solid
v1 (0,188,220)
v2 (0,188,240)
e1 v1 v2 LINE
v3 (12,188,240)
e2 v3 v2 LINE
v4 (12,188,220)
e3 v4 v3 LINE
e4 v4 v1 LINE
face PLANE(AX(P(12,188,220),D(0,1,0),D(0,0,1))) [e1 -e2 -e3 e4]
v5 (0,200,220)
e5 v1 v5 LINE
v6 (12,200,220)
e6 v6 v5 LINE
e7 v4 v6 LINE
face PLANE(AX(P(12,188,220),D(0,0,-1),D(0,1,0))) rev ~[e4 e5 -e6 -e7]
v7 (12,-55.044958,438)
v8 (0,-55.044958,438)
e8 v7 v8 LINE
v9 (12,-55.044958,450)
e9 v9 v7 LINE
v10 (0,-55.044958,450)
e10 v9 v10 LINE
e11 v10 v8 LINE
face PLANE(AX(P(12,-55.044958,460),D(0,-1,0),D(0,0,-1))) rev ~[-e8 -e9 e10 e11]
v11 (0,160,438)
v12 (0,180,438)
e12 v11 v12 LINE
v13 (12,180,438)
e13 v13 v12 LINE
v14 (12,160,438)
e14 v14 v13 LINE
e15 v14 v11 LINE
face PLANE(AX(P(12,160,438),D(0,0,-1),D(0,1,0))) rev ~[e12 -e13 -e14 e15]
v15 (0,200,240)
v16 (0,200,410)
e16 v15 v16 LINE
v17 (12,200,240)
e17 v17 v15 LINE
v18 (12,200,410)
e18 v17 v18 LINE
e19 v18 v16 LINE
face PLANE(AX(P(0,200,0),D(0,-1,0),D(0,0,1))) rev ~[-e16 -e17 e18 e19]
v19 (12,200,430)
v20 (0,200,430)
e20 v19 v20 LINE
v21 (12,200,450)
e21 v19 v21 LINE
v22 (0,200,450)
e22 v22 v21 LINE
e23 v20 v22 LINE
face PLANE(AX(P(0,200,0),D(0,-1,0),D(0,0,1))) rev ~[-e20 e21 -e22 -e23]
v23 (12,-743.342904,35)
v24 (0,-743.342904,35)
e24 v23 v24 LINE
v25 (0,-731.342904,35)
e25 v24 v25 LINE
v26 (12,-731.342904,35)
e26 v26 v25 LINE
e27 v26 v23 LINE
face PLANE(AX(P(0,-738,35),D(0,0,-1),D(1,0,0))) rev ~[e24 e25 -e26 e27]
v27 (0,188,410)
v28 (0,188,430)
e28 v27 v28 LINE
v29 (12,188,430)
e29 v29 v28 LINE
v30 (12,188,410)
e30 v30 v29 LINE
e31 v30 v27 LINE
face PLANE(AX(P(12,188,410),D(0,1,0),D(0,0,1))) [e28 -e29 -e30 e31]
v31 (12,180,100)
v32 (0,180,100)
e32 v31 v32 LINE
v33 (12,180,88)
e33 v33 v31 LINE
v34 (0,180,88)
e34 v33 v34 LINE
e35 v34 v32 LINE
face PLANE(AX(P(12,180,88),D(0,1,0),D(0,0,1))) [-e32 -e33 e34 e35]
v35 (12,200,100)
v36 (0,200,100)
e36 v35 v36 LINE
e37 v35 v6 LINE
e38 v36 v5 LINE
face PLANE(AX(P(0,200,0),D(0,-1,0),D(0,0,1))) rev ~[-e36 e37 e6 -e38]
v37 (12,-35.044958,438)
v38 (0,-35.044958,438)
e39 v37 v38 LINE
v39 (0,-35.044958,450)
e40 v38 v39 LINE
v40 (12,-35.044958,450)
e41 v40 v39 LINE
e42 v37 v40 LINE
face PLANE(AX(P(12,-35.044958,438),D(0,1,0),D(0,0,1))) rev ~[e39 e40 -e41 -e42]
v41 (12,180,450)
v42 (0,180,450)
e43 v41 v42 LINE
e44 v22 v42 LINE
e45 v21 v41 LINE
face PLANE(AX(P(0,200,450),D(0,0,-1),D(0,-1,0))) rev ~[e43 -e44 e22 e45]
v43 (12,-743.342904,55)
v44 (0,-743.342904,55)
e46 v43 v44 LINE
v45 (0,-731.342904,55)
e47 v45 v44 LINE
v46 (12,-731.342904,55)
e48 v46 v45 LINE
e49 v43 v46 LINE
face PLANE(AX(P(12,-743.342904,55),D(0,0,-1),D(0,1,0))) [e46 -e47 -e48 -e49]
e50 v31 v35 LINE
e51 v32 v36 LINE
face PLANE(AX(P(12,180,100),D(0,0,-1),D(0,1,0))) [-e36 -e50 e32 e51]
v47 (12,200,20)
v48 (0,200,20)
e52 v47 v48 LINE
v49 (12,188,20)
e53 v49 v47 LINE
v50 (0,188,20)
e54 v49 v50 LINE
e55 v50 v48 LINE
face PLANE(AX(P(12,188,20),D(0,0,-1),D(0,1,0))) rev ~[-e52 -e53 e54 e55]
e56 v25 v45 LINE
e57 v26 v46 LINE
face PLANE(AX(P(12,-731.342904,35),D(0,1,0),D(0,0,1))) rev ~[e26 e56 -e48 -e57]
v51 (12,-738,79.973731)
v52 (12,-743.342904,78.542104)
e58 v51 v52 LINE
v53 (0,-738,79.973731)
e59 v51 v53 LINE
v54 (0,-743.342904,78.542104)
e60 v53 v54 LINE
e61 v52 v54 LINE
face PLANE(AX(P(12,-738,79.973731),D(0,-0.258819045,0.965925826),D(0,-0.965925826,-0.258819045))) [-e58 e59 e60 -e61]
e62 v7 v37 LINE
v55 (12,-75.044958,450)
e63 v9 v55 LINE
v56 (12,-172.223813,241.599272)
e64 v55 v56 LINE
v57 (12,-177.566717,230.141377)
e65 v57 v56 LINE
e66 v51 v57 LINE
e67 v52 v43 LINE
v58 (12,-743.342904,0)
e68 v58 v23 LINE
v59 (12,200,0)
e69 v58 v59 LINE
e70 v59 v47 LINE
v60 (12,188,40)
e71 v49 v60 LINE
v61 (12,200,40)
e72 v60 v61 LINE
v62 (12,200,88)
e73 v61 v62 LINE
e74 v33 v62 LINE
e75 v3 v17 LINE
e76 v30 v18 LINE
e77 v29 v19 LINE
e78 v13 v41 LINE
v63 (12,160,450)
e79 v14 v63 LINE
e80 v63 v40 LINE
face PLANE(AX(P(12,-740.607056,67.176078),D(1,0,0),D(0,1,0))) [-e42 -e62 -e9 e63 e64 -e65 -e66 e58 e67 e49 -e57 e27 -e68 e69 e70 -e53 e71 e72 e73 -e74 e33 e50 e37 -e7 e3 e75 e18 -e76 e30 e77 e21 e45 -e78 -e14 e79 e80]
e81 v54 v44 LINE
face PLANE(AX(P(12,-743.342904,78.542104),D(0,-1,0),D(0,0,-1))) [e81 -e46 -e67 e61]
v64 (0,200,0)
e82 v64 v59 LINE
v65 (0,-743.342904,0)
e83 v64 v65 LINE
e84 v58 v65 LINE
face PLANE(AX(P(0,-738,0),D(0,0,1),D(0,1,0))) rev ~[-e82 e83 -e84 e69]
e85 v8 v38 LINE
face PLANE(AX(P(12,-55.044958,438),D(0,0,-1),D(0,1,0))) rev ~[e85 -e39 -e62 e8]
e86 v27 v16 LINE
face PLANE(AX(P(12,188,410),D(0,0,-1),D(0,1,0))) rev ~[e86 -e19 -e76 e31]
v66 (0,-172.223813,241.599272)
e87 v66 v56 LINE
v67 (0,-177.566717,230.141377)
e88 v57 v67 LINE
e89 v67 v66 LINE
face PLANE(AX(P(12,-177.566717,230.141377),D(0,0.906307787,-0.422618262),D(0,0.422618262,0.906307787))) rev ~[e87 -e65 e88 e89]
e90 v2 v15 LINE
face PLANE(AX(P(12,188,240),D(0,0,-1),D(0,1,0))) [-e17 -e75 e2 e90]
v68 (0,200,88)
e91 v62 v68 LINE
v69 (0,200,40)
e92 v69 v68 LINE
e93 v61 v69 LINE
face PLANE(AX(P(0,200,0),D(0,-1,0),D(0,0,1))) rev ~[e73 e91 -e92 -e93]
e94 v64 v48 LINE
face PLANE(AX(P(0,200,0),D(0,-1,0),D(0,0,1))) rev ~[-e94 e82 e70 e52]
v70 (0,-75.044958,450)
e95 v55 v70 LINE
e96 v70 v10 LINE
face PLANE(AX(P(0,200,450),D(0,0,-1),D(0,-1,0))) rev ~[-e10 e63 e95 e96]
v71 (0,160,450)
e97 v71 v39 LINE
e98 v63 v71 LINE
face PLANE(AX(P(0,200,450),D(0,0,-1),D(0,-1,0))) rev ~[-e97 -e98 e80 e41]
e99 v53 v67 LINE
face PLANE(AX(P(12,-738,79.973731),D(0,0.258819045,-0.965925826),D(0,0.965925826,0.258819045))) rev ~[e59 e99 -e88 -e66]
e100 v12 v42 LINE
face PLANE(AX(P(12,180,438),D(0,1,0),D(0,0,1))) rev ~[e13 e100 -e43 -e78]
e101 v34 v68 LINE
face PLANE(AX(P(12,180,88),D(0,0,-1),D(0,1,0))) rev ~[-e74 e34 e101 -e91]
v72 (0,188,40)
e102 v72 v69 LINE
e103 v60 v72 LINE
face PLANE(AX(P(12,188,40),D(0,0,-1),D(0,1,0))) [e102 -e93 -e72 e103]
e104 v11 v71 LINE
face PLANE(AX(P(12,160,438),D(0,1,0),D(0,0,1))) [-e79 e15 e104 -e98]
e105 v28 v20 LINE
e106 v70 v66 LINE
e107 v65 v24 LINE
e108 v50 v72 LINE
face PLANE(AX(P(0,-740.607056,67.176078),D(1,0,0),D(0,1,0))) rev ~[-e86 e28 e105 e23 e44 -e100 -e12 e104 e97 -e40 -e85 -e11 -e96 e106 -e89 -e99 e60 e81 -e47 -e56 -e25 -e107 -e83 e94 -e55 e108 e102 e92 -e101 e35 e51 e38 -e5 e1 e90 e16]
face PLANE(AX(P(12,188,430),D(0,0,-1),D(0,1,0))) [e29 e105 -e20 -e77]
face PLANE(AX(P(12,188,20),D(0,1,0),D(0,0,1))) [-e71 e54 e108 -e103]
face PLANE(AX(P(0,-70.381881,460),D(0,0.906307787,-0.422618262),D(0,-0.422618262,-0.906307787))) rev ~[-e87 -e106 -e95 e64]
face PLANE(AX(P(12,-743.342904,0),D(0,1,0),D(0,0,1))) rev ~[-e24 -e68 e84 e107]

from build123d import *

# Parameters (mm, degrees)
F0_W      = 200
F0_H      = 460
F1_DEPTH  = 12
F2_W      = 12
F2_H      = 20
F2_W_2    = 20
F2_H_2    = 22
F3_DEPTH  = 25
F4_DEPTH  = 10
F6_W      = 12
F6_H      = 20
F7_DEPTH  = 12
F8_W      = 20
F8_H      = 12
F9_DEPTH  = 25
F11_DEPTH = 25
F12_W     = 5.3429044291
F12_H     = 20
F12_H_2   = 35
F13_DEPTH = 12


# Not quite as in the source:
# - a feature of the source that left no trace in its solid (it failed there, or was rolled back) is left out
# - a feature names something its author has since deleted; it is built from what else it names


with BuildPart() as f1:
    # F0 (on Right) → F1 (new body)
    with BuildSketch(Plane.YZ):
        Polygon((-738, 0), (0, 0), (0, 460), (-70.3818810435, 460), (-172.2238128496, 241.5992724437), (-738, 90), align=None)
        with Locations((100, 230)):
            Rectangle(F0_W, F0_H)
    extrude(amount=F1_DEPTH)

    # F2 (on face) → F3 (cut)
    with BuildSketch(Plane.YZ.offset(12)):
        with Locations((194, 30)):
            Rectangle(F2_W, F2_H)
        with Locations((194, 230)):
            Rectangle(F2_W, F2_H)
        with Locations((194, 420)):
            Rectangle(F2_W, F2_H)
        with Locations((170, 449)):
            Rectangle(F2_W_2, F2_H_2)
        Polygon((-35.0449576251, 460), (-55.0449576251, 460), (-55.0449576251, 450), (-55.0449576251, 438), (-35.0449576251, 438), align=None)
    extrude(amount=-F3_DEPTH, mode=Mode.SUBTRACT)

    # F4 (cut): faces of the model
    f4_faces = [f1.faces().sort_by_distance(p)[0] for p in [
        (6, -62.7134193343, 460),
        (6, 62.4775211875, 460),
        (6, 190, 460),
    ]]
    extrude(f4_faces, amount=-F4_DEPTH, mode=Mode.SUBTRACT)

    # F6 (on face) → F7 (cut)
    with BuildSketch(Plane.XZ.offset(738)):
        with Locations((6, 45)):
            Rectangle(F6_W, F6_H)
    extrude(amount=-F7_DEPTH, mode=Mode.SUBTRACT)

    # F8 (on face) → F9 (cut)
    with BuildSketch(Plane.YZ.offset(12)):
        with Locations((190, 94)):
            Rectangle(F8_W, F8_H)
        Polygon((-70.3818810435, 460), (-75.0449576251, 450), (-70.3818810435, 450), align=None)
    extrude(amount=-F9_DEPTH, mode=Mode.SUBTRACT)

    # F10 (on face) → F11 (cut)
    with BuildSketch(Plane.YZ.offset(12)):
        Polygon((-177.5667172787, 230.14137692), (-172.2238128496, 241.5992724437), (-738, 90), (-738, 79.9737314033), align=None)
    extrude(amount=-F11_DEPTH, mode=Mode.SUBTRACT)

    # F12 (on face) → F13 (join)
    with BuildSketch(Plane.YZ.offset(12)):
        Polygon((-738, 55), (-738, 79.9737314033), (-743.3429044291, 78.5421044763), (-743.3429044291, 55), align=None)
        with Locations((-728.6714522145, 45)):
            Rectangle(F12_W, F12_H)
        with Locations((-740.6714522145, 17.5)):
            Rectangle(F12_W, F12_H_2)
    extrude(amount=-F13_DEPTH)


solid = f1.part
